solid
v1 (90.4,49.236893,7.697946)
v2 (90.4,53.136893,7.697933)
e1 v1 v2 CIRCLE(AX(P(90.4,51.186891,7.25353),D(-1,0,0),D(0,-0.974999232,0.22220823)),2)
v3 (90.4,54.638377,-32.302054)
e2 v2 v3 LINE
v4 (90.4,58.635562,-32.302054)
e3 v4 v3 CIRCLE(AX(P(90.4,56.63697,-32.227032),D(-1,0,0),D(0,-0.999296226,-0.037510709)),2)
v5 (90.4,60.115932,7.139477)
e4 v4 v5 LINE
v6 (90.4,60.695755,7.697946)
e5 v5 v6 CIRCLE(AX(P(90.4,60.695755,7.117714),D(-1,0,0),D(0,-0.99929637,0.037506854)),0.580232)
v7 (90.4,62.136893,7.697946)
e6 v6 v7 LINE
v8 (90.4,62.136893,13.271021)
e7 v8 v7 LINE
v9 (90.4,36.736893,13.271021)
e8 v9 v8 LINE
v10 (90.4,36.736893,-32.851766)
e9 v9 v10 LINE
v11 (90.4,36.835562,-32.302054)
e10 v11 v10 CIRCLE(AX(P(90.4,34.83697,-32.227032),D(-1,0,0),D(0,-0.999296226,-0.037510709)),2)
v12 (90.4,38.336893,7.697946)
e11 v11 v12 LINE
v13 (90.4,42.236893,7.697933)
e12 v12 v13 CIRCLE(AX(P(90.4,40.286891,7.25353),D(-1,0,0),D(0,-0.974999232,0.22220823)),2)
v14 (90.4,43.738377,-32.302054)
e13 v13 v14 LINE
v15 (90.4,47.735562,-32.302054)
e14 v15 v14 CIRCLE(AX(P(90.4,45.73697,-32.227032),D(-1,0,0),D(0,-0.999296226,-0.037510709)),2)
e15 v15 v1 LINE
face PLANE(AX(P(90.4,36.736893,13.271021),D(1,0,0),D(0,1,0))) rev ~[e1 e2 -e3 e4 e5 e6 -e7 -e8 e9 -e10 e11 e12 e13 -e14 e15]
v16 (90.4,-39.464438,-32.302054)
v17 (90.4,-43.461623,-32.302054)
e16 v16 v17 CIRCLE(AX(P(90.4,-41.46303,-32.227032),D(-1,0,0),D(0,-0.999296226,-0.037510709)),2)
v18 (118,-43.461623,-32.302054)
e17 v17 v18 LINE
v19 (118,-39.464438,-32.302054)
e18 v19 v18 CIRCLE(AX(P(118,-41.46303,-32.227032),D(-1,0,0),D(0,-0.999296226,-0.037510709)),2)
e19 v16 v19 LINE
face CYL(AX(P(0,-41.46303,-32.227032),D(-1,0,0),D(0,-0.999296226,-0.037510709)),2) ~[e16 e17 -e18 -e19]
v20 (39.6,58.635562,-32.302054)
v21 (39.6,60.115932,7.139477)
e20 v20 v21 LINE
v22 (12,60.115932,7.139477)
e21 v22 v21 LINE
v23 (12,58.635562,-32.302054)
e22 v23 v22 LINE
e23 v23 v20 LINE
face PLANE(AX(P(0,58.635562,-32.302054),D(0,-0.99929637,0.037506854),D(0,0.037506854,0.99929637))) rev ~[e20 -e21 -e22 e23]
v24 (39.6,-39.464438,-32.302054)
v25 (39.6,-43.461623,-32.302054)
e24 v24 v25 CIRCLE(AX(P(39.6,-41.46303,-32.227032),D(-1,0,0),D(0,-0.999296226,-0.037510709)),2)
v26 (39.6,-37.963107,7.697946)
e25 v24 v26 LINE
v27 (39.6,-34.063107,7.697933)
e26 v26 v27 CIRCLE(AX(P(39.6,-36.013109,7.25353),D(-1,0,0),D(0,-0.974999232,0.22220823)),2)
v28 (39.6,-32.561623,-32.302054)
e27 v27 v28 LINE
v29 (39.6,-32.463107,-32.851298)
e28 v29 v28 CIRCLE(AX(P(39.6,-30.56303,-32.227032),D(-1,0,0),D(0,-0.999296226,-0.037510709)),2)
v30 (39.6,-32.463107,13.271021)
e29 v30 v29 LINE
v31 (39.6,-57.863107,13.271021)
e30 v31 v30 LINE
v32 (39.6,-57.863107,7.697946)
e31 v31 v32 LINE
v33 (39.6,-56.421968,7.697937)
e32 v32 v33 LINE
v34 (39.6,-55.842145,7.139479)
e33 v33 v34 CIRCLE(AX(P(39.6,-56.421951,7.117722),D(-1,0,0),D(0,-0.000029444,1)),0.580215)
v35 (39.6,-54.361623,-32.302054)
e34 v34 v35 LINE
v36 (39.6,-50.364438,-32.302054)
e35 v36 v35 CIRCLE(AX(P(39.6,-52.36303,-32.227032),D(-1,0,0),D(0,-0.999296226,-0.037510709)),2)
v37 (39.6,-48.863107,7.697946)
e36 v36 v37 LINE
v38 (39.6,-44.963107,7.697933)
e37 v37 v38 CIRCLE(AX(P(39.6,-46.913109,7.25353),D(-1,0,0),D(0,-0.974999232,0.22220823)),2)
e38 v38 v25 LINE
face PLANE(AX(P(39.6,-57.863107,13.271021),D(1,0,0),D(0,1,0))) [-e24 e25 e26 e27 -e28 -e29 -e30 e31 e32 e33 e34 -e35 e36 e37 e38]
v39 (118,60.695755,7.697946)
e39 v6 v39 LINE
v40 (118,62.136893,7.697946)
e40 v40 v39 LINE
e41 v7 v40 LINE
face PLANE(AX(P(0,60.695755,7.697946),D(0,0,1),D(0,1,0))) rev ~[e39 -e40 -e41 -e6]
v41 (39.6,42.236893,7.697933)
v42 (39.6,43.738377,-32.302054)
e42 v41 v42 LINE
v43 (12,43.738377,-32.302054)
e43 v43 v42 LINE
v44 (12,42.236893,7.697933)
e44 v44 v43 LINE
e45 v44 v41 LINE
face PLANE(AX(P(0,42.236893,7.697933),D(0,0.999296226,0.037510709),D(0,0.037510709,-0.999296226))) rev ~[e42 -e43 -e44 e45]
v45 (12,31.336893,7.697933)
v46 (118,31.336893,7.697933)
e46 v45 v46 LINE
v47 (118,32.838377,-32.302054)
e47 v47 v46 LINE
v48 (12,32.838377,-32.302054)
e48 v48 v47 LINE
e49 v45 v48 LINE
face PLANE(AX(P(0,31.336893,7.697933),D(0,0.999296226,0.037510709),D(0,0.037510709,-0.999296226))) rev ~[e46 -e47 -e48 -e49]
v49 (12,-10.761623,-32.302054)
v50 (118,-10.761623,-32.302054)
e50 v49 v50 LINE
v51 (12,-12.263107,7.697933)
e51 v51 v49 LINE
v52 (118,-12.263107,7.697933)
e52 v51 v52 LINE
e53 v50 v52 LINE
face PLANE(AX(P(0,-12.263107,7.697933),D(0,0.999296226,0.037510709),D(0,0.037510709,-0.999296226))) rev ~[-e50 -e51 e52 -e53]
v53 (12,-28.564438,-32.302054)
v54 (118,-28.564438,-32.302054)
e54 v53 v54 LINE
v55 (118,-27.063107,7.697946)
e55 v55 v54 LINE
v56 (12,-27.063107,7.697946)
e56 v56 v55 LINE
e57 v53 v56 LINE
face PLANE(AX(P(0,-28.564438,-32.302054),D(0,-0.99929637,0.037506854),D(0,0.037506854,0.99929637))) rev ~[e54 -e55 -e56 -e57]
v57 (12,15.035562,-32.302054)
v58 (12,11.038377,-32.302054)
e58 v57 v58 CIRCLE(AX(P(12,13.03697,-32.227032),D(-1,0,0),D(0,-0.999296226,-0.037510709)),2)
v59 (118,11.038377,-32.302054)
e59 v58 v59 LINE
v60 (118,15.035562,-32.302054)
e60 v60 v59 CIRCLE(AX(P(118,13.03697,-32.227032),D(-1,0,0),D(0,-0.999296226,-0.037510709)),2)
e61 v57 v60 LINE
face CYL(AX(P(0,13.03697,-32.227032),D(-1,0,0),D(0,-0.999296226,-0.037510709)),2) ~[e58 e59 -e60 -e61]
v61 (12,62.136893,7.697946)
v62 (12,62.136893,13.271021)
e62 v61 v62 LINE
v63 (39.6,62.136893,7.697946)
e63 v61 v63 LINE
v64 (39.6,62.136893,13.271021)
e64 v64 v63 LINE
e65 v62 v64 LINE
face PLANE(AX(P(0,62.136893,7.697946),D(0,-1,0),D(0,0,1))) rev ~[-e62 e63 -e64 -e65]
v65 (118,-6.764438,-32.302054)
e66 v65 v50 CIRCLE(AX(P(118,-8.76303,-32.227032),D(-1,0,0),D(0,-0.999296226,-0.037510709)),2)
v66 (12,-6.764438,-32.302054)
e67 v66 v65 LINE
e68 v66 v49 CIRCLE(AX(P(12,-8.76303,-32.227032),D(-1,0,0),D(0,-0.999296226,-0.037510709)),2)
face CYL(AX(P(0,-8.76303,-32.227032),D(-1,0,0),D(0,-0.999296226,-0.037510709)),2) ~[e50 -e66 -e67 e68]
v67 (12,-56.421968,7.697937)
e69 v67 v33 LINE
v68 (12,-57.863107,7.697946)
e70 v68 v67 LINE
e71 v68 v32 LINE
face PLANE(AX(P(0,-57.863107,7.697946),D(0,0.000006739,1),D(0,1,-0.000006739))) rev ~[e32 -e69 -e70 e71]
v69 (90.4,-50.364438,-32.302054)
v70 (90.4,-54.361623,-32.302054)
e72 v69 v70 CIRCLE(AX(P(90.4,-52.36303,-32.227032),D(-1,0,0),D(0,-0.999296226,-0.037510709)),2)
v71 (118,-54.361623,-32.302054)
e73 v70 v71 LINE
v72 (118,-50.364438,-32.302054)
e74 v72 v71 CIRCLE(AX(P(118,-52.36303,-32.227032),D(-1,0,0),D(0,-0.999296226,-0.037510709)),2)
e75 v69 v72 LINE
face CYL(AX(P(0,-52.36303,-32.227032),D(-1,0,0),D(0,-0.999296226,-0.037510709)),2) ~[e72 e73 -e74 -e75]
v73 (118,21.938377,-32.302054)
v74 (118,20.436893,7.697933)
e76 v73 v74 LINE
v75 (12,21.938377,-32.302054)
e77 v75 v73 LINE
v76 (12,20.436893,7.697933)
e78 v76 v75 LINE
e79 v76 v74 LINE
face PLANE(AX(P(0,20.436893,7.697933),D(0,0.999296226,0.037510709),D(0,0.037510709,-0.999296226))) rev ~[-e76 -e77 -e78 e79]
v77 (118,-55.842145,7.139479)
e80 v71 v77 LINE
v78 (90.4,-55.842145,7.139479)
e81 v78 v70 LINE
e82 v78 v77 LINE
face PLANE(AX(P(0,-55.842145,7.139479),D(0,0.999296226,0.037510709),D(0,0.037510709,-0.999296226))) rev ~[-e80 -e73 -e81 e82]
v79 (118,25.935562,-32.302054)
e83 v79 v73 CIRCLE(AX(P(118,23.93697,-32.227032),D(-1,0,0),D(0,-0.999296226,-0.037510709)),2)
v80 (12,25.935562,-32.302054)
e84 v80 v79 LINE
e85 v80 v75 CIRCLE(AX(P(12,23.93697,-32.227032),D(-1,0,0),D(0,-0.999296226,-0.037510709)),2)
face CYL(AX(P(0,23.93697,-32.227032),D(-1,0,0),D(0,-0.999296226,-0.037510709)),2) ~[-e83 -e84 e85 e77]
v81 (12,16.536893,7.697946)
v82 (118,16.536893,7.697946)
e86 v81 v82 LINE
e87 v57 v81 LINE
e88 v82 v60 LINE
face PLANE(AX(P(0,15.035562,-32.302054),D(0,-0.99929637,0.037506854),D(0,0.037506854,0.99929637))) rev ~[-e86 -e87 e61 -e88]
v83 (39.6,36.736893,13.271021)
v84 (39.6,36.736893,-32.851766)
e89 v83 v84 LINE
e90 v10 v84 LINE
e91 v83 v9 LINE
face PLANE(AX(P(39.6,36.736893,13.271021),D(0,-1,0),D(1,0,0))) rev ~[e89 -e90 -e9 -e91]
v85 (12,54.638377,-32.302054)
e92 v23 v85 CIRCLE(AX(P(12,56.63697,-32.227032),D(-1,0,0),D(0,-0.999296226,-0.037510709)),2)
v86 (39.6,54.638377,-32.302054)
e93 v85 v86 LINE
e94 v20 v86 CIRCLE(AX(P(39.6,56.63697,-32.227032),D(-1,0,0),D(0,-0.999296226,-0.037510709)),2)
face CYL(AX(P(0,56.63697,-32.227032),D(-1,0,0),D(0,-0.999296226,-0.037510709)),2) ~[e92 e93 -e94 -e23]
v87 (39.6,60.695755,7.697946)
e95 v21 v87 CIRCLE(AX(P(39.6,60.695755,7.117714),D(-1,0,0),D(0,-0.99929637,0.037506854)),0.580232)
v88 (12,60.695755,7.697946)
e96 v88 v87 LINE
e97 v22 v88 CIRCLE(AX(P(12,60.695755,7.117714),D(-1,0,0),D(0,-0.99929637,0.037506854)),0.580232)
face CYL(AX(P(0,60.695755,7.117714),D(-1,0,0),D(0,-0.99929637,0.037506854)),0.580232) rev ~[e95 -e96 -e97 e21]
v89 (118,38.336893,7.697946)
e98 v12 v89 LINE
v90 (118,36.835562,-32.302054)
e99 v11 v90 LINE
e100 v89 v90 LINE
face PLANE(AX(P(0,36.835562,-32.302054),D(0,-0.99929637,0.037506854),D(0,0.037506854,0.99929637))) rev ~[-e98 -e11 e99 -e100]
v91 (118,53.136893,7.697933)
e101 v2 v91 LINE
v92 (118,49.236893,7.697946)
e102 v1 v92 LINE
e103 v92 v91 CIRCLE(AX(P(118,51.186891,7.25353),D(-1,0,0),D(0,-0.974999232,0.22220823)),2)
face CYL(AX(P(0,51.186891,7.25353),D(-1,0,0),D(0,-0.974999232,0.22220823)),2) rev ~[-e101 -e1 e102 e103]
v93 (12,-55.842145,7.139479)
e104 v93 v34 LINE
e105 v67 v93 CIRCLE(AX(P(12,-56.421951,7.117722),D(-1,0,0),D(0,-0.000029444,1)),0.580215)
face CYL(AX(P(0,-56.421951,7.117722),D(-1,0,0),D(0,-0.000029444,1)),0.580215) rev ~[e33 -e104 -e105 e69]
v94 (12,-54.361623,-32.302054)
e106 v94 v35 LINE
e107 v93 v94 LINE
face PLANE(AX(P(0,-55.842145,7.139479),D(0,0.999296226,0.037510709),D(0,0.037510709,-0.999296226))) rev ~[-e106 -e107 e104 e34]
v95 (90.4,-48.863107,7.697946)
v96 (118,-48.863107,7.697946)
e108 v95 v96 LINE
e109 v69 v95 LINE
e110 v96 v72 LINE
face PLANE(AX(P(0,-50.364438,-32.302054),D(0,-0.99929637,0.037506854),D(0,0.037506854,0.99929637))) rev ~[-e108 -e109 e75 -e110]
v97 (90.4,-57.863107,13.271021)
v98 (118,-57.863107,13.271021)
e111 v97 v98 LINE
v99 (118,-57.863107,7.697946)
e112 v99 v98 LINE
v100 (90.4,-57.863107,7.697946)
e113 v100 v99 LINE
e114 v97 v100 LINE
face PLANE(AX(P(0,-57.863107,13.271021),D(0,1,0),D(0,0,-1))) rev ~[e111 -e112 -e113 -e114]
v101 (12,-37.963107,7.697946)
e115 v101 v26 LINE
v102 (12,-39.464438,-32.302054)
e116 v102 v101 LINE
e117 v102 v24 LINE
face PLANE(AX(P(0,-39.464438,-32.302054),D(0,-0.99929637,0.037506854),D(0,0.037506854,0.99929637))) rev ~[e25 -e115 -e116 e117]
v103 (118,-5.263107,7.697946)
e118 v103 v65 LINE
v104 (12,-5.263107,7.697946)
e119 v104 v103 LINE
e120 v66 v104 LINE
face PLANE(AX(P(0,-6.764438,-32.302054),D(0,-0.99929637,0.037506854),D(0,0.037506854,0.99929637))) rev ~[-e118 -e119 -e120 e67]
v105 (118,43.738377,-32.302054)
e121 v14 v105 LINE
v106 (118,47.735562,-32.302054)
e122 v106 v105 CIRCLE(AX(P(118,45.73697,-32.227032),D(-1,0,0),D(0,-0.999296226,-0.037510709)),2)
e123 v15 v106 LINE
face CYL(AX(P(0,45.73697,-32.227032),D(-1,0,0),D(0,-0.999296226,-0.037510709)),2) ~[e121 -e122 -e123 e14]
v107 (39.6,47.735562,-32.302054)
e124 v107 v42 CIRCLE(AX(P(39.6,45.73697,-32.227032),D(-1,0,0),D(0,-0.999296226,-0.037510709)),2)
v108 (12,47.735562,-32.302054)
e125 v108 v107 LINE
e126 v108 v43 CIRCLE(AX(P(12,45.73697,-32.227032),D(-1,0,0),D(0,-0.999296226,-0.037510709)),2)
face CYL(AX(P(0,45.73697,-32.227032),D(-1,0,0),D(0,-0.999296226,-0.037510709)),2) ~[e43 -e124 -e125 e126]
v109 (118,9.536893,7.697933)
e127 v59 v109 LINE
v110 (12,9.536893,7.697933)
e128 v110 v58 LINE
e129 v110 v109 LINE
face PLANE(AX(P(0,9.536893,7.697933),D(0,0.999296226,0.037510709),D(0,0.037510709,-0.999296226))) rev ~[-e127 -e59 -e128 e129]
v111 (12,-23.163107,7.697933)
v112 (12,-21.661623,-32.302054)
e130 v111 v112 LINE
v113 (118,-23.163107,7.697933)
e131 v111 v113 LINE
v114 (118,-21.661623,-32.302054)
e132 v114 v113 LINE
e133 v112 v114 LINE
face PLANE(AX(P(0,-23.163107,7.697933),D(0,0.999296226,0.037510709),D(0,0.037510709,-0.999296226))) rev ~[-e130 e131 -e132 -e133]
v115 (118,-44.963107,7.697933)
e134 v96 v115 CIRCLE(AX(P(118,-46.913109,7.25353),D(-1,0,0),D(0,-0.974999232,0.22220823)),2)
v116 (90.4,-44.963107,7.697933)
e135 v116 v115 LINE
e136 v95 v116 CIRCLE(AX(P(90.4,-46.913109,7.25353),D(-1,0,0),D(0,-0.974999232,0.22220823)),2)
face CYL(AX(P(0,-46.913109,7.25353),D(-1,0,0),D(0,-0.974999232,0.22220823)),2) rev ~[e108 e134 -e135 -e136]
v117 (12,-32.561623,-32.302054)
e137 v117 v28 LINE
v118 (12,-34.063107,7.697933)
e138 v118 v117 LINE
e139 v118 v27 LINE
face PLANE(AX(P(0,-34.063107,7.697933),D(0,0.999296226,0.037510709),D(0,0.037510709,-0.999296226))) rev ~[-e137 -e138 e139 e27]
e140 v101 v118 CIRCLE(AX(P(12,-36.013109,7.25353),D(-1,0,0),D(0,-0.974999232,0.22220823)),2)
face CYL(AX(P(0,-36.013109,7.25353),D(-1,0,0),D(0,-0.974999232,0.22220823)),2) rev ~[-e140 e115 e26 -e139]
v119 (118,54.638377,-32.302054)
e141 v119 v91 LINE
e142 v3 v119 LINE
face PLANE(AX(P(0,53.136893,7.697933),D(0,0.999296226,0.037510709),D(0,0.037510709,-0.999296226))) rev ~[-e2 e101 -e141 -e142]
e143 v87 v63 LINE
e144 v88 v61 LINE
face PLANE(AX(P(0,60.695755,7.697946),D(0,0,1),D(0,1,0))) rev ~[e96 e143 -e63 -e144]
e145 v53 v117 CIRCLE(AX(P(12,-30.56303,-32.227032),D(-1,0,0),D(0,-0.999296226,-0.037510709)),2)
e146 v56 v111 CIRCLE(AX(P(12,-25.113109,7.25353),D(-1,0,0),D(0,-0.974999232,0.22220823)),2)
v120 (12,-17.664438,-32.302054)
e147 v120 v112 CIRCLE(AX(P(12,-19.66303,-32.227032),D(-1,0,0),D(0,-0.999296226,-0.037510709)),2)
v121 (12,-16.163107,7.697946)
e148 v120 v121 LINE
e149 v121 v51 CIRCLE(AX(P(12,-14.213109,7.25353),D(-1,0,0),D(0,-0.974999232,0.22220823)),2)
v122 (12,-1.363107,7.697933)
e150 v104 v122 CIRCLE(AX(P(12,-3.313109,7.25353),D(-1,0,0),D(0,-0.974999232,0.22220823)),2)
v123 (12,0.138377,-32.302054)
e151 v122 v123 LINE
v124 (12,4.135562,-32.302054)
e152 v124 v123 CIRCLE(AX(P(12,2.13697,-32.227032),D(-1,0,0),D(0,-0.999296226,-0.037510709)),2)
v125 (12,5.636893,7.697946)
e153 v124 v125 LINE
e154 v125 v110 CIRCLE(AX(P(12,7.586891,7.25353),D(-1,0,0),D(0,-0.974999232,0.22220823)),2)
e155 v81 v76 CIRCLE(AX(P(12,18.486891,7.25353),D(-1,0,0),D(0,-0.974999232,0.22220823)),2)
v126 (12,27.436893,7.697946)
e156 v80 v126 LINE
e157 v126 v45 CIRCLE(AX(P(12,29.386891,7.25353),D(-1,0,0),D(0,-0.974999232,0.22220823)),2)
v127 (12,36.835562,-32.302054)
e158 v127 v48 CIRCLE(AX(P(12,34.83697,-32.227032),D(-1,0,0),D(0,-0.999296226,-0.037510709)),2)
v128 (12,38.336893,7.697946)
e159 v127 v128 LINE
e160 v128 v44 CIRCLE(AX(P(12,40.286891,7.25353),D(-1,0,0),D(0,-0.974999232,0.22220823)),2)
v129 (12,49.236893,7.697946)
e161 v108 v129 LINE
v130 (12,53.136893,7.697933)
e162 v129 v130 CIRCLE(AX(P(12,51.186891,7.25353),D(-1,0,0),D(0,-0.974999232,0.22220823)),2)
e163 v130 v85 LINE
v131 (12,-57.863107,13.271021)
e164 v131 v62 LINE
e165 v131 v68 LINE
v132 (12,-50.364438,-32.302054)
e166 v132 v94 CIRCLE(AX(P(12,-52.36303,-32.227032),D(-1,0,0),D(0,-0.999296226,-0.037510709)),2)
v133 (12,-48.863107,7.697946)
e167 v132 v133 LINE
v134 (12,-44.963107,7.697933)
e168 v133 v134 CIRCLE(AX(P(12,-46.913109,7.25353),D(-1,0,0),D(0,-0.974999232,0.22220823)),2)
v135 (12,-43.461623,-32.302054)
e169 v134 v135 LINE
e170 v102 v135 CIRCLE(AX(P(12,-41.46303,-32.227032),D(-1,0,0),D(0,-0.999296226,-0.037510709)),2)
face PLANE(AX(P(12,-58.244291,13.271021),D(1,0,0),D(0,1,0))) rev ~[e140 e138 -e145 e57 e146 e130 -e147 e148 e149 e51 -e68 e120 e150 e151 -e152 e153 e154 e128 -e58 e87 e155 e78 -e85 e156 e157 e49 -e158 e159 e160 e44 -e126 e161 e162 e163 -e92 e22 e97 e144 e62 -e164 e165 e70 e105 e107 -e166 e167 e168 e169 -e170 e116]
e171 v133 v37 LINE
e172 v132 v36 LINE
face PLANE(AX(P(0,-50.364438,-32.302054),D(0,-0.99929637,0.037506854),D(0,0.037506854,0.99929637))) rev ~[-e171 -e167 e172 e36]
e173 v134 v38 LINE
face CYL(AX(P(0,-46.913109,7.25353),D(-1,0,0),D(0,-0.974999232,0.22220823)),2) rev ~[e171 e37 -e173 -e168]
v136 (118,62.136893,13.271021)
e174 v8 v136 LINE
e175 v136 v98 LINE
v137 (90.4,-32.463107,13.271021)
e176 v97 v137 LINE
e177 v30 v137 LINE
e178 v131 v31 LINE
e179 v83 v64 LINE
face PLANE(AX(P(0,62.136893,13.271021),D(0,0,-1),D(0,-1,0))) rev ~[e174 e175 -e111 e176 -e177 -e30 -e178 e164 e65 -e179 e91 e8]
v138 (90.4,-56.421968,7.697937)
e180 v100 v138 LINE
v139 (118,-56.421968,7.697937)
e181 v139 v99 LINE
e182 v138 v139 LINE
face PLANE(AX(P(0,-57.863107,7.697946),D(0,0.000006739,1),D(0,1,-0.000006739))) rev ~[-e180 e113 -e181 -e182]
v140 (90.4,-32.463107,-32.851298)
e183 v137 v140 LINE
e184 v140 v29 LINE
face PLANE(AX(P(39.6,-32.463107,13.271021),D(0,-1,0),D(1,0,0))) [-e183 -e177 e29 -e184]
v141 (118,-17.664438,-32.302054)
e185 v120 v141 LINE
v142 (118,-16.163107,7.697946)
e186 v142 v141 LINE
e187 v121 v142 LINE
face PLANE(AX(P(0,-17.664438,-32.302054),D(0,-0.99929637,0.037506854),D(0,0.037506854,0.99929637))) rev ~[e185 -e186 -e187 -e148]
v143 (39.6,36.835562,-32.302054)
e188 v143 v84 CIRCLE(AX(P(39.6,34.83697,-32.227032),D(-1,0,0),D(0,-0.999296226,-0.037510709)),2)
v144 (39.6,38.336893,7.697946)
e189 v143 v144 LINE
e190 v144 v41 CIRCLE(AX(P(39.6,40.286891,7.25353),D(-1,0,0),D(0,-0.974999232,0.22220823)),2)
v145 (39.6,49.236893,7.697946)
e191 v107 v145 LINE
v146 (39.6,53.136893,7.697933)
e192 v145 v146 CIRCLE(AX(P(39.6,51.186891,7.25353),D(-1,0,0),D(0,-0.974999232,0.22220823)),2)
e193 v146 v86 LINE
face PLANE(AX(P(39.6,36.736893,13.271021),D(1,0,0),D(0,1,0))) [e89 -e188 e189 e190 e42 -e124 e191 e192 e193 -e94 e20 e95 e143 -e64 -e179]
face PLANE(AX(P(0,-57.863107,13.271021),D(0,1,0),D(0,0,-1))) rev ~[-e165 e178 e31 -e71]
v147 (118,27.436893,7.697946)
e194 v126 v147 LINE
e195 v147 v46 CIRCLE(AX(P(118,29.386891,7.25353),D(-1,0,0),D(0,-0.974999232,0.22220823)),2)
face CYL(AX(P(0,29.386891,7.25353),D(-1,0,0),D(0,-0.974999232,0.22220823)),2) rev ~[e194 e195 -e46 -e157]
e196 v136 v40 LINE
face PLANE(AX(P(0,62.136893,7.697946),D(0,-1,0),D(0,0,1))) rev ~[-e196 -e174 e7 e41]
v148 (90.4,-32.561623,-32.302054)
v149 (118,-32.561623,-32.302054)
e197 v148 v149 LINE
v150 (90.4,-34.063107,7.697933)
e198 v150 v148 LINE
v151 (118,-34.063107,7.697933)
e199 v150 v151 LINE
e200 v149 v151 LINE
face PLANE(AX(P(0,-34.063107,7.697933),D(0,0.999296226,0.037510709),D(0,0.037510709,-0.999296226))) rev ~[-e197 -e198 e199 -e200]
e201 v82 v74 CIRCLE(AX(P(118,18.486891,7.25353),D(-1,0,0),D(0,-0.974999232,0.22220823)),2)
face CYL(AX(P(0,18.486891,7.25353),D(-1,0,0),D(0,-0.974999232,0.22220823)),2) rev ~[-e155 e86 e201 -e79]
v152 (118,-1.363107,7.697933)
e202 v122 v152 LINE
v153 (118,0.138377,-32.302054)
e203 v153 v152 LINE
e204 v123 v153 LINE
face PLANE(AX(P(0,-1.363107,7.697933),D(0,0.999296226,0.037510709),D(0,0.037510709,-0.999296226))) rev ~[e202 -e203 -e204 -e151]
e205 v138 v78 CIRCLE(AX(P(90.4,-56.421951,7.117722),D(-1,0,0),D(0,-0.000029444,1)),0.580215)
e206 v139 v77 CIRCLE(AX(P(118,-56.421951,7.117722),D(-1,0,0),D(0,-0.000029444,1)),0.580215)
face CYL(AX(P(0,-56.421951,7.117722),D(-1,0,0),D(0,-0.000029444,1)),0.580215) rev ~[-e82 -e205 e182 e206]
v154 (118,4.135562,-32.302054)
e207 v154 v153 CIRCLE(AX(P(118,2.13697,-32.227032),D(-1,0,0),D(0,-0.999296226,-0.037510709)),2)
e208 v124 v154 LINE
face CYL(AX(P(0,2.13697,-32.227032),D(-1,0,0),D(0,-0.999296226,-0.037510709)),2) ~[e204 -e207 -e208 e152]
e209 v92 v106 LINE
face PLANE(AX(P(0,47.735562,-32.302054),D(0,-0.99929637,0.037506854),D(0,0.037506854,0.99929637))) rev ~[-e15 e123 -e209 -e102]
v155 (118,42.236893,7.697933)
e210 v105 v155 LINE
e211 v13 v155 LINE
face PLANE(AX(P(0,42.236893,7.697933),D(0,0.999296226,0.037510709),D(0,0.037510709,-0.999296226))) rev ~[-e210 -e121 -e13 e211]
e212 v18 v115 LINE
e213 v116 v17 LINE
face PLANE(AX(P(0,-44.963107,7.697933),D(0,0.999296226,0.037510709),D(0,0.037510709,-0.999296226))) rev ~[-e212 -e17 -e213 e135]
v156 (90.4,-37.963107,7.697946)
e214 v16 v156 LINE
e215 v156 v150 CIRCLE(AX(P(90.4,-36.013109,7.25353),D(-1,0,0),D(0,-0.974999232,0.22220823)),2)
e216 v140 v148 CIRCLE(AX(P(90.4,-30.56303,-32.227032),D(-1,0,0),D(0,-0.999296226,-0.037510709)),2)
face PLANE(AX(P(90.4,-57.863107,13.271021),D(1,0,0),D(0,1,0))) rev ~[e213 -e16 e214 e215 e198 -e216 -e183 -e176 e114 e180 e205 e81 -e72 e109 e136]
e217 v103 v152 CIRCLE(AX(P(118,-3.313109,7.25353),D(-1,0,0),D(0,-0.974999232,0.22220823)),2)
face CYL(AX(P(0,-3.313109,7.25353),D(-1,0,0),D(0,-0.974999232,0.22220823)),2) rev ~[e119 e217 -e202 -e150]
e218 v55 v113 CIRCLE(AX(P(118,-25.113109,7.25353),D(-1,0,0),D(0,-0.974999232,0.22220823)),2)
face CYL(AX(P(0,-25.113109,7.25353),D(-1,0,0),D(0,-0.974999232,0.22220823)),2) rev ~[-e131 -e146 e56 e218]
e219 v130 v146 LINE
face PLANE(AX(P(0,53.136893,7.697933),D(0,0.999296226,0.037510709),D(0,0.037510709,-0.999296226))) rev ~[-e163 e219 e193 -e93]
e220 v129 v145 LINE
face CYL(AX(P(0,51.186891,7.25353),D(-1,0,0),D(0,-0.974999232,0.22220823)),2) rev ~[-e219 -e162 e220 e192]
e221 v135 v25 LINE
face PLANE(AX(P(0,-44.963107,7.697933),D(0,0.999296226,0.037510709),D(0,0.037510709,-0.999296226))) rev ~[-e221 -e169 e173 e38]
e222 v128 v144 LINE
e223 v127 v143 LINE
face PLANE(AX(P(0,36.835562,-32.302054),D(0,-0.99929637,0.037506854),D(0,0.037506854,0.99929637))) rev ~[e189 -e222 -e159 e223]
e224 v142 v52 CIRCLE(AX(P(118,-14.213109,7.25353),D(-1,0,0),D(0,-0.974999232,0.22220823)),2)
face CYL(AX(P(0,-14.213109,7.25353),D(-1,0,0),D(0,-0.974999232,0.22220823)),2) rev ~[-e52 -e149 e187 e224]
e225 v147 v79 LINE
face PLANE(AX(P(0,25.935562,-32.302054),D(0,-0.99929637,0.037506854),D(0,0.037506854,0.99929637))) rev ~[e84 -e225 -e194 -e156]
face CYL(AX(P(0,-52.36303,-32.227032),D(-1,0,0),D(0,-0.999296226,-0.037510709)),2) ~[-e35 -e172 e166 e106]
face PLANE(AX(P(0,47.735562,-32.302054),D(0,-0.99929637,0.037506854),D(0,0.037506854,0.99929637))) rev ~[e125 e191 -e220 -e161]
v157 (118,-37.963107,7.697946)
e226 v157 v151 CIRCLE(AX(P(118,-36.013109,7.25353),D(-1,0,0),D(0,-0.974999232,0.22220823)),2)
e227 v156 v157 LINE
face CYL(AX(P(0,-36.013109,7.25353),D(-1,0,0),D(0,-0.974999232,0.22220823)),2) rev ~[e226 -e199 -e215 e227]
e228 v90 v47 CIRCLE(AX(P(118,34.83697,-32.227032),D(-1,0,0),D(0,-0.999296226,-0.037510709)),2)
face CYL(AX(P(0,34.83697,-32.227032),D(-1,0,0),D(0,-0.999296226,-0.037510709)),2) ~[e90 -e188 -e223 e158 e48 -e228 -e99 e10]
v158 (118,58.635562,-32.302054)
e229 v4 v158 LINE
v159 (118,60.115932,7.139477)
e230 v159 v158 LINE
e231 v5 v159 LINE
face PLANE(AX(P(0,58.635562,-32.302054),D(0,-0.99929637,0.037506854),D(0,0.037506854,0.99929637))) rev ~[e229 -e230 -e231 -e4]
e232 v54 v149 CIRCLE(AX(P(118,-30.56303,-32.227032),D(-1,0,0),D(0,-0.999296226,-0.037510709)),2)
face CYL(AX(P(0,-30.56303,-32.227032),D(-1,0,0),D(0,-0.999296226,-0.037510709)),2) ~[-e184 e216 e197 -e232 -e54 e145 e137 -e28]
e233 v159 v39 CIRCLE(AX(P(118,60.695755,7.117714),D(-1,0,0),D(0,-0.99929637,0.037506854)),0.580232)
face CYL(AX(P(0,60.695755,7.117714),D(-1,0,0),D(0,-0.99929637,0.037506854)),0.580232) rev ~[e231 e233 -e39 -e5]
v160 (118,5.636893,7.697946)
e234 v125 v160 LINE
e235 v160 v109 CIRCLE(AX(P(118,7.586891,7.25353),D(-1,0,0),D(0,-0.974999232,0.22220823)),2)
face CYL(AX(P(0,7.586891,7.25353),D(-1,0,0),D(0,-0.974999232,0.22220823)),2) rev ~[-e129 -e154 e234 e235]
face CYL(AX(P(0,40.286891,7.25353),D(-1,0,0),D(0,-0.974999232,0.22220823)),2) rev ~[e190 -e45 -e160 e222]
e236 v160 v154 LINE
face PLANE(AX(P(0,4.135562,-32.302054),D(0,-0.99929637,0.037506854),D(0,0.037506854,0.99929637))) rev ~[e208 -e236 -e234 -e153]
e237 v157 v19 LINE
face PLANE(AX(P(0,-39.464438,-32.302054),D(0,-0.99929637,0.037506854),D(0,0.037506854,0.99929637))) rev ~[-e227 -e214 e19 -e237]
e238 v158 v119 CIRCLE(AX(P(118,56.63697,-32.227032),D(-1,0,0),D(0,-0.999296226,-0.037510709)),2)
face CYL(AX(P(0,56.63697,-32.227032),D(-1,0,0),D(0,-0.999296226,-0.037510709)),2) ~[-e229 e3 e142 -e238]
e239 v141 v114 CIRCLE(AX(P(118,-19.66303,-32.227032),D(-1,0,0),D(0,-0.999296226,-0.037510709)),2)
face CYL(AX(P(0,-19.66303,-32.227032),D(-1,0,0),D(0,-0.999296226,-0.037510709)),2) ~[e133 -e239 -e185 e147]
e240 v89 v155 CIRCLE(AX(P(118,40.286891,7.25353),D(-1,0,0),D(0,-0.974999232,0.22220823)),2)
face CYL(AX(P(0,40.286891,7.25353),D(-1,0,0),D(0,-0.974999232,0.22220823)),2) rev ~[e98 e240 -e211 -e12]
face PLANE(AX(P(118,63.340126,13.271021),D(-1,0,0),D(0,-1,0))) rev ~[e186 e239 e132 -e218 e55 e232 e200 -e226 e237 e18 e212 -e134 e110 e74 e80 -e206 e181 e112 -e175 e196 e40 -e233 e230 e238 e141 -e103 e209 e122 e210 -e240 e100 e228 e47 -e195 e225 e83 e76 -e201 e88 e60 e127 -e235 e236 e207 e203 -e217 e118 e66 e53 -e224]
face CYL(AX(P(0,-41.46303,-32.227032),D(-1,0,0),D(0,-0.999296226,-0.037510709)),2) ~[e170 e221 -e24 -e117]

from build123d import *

# Parameters (mm, degrees)
F1_DEPTH = 130
F2_W     = 50.8
F2_H     = 25.4
F3_DEPTH = 79.5
F4_W     = 12
F4_H     = 50.7057624385
F4_H_2   = 69.7820825055
F4_H_3   = 69.8881107867
F4_H_4   = 52.3517530859
F5_DEPTH = 47.4990536315


# Not quite as in the source:
# - ends of sketch curves that miss each other by under 0.0002 mm in the source are joined
# - a feature names something its author has since deleted; it is built from what else it names


with BuildPart() as f1:
    # F0 (on Right) → F1 (new body)
    with BuildSketch(Plane.YZ):
        with BuildLine():
            Line((62.1368927236, 13.271021442), (-57.8631072764, 13.271021442))
            Line((-57.8631072764, 13.271021442), (-57.8631072764, 7.697946392))
            Line((-57.8631072764, 7.697946392), (-56.4219683785, 7.6979366796))
            ThreePointArc((-56.4219683785, 7.6979366796), (-56.0194508606, 7.5356245361), (-55.8421445251, 7.1394791077))
            Line((-55.8421445251, 7.1394791077), (-54.3616227062, -32.302053608))
            ThreePointArc((-54.3616227062, -32.302053608), (-52.3630302548, -34.2270321895), (-50.3644378034, -32.302053608))
            Line((-50.3644378034, -32.302053608), (-48.8631072764, 7.697946392))
            ThreePointArc((-48.8631072764, 7.697946392), (-46.9131019002, 9.2535299318), (-44.9631072764, 7.6979329132))
            Line((-44.9631072764, 7.6979329132), (-43.4616227062, -32.302053608))
            ThreePointArc((-43.4616227062, -32.302053608), (-41.4630302548, -34.2270321895), (-39.4644378034, -32.302053608))
            Line((-39.4644378034, -32.302053608), (-37.9631072764, 7.697946392))
            ThreePointArc((-37.9631072764, 7.697946392), (-36.0131019002, 9.2535299318), (-34.0631072764, 7.6979329132))
            Line((-34.0631072764, 7.6979329132), (-32.5616227062, -32.302053608))
            ThreePointArc((-32.5616227062, -32.302053608), (-30.5630302548, -34.2270321895), (-28.5644378034, -32.302053608))
            Line((-28.5644378034, -32.302053608), (-27.0631072764, 7.697946392))
            ThreePointArc((-27.0631072764, 7.697946392), (-25.1131019002, 9.2535299318), (-23.1631072764, 7.6979329132))
            Line((-23.1631072764, 7.6979329132), (-21.6616227062, -32.302053608))
            ThreePointArc((-21.6616227062, -32.302053608), (-19.6630302548, -34.2270321895), (-17.6644378034, -32.302053608))
            Line((-17.6644378034, -32.302053608), (-16.1631072764, 7.697946392))
            ThreePointArc((-16.1631072764, 7.697946392), (-14.2131019002, 9.2535299318), (-12.2631072764, 7.6979329132))
            Line((-12.2631072764, 7.6979329132), (-10.7616227062, -32.302053608))
            ThreePointArc((-10.7616227062, -32.302053608), (-8.7630302548, -34.2270321895), (-6.7644378034, -32.302053608))
            Line((-6.7644378034, -32.302053608), (-5.2631072764, 7.697946392))
            ThreePointArc((-5.2631072764, 7.697946392), (-3.3131019002, 9.2535299318), (-1.3631072764, 7.6979329132))
            Line((-1.3631072764, 7.6979329132), (0.1383772938, -32.302053608))
            ThreePointArc((0.1383772938, -32.302053608), (2.1369697452, -34.2270321895), (4.1355621966, -32.302053608))
            Line((4.1355621966, -32.302053608), (5.6368927236, 7.697946392))
            ThreePointArc((5.6368927236, 7.697946392), (7.5868980998, 9.2535299318), (9.5368927236, 7.6979329132))
            Line((9.5368927236, 7.6979329132), (11.0383772938, -32.302053608))
            ThreePointArc((11.0383772938, -32.302053608), (13.0369697452, -34.2270321895), (15.0355621966, -32.302053608))
            Line((15.0355621966, -32.302053608), (16.5368927236, 7.697946392))
            ThreePointArc((16.5368927236, 7.697946392), (18.4868980998, 9.2535299318), (20.4368927236, 7.6979329132))
            Line((20.4368927236, 7.6979329132), (21.9383772938, -32.302053608))
            ThreePointArc((21.9383772938, -32.302053608), (23.9369697452, -34.2270321895), (25.9355621966, -32.302053608))
            Line((25.9355621966, -32.302053608), (27.4368927236, 7.697946392))
            ThreePointArc((27.4368927236, 7.697946392), (29.3868980998, 9.2535299318), (31.3368927236, 7.6979329132))
            Line((31.3368927236, 7.6979329132), (32.8383772938, -32.302053608))
            ThreePointArc((32.8383772938, -32.302053608), (34.8369697452, -34.2270321895), (36.8355621966, -32.302053608))
            Line((36.8355621966, -32.302053608), (38.3368927236, 7.697946392))
            ThreePointArc((38.3368927236, 7.697946392), (40.2868980998, 9.2535299318), (42.2368927236, 7.6979329132))
            Line((42.2368927236, 7.6979329132), (43.7383772938, -32.302053608))
            ThreePointArc((43.7383772938, -32.302053608), (45.7369697452, -34.2270321895), (47.7355621966, -32.302053608))
            Line((47.7355621966, -32.302053608), (49.2368927236, 7.697946392))
            ThreePointArc((49.2368927236, 7.697946392), (51.1868980998, 9.2535299318), (53.1368927236, 7.6979329132))
            Line((53.1368927236, 7.6979329132), (54.6383772938, -32.302053608))
            ThreePointArc((54.6383772938, -32.302053608), (56.6369697452, -34.2270321895), (58.6355621966, -32.302053608))
            Line((58.6355621966, -32.302053608), (60.11593154, 7.1394768706))
            ThreePointArc((60.11593154, 7.1394768706), (60.2932371534, 7.5356237596), (60.6957554774, 7.697946392))
            Line((60.6957554774, 7.697946392), (62.1368927236, 7.697946392))
            Line((62.1368927236, 7.697946392), (62.1368927236, 13.271021442))
        make_face()
    extrude(amount=F1_DEPTH)

    # F2 (on face) → F3 (cut)
    with BuildSketch(Plane.XY.offset(13.271021442)):
        with Locations((65, -45.1631072764)):
            Rectangle(F2_W, F2_H)
        with Locations((65, 49.4368927236)):
            Rectangle(F2_W, F2_H)
    extrude(amount=-F3_DEPTH, mode=Mode.SUBTRACT)

    # F4 (on face) → F5 (cut, through all)
    with BuildSketch(Plane.XY.offset(13.271021442)):
        with Locations((6, 36.890672449)):
            Rectangle(F4_W, F4_H)
        with Locations((6, -23.353250023)):
            Rectangle(F4_W, F4_H_2)
        with Locations((124, -23.955682084)):
            Rectangle(F4_W, F4_H_3)
        with Locations((124, 37.1642498523)):
            Rectangle(F4_W, F4_H_4)
    extrude(amount=-F5_DEPTH, mode=Mode.SUBTRACT)


solid = f1.part
